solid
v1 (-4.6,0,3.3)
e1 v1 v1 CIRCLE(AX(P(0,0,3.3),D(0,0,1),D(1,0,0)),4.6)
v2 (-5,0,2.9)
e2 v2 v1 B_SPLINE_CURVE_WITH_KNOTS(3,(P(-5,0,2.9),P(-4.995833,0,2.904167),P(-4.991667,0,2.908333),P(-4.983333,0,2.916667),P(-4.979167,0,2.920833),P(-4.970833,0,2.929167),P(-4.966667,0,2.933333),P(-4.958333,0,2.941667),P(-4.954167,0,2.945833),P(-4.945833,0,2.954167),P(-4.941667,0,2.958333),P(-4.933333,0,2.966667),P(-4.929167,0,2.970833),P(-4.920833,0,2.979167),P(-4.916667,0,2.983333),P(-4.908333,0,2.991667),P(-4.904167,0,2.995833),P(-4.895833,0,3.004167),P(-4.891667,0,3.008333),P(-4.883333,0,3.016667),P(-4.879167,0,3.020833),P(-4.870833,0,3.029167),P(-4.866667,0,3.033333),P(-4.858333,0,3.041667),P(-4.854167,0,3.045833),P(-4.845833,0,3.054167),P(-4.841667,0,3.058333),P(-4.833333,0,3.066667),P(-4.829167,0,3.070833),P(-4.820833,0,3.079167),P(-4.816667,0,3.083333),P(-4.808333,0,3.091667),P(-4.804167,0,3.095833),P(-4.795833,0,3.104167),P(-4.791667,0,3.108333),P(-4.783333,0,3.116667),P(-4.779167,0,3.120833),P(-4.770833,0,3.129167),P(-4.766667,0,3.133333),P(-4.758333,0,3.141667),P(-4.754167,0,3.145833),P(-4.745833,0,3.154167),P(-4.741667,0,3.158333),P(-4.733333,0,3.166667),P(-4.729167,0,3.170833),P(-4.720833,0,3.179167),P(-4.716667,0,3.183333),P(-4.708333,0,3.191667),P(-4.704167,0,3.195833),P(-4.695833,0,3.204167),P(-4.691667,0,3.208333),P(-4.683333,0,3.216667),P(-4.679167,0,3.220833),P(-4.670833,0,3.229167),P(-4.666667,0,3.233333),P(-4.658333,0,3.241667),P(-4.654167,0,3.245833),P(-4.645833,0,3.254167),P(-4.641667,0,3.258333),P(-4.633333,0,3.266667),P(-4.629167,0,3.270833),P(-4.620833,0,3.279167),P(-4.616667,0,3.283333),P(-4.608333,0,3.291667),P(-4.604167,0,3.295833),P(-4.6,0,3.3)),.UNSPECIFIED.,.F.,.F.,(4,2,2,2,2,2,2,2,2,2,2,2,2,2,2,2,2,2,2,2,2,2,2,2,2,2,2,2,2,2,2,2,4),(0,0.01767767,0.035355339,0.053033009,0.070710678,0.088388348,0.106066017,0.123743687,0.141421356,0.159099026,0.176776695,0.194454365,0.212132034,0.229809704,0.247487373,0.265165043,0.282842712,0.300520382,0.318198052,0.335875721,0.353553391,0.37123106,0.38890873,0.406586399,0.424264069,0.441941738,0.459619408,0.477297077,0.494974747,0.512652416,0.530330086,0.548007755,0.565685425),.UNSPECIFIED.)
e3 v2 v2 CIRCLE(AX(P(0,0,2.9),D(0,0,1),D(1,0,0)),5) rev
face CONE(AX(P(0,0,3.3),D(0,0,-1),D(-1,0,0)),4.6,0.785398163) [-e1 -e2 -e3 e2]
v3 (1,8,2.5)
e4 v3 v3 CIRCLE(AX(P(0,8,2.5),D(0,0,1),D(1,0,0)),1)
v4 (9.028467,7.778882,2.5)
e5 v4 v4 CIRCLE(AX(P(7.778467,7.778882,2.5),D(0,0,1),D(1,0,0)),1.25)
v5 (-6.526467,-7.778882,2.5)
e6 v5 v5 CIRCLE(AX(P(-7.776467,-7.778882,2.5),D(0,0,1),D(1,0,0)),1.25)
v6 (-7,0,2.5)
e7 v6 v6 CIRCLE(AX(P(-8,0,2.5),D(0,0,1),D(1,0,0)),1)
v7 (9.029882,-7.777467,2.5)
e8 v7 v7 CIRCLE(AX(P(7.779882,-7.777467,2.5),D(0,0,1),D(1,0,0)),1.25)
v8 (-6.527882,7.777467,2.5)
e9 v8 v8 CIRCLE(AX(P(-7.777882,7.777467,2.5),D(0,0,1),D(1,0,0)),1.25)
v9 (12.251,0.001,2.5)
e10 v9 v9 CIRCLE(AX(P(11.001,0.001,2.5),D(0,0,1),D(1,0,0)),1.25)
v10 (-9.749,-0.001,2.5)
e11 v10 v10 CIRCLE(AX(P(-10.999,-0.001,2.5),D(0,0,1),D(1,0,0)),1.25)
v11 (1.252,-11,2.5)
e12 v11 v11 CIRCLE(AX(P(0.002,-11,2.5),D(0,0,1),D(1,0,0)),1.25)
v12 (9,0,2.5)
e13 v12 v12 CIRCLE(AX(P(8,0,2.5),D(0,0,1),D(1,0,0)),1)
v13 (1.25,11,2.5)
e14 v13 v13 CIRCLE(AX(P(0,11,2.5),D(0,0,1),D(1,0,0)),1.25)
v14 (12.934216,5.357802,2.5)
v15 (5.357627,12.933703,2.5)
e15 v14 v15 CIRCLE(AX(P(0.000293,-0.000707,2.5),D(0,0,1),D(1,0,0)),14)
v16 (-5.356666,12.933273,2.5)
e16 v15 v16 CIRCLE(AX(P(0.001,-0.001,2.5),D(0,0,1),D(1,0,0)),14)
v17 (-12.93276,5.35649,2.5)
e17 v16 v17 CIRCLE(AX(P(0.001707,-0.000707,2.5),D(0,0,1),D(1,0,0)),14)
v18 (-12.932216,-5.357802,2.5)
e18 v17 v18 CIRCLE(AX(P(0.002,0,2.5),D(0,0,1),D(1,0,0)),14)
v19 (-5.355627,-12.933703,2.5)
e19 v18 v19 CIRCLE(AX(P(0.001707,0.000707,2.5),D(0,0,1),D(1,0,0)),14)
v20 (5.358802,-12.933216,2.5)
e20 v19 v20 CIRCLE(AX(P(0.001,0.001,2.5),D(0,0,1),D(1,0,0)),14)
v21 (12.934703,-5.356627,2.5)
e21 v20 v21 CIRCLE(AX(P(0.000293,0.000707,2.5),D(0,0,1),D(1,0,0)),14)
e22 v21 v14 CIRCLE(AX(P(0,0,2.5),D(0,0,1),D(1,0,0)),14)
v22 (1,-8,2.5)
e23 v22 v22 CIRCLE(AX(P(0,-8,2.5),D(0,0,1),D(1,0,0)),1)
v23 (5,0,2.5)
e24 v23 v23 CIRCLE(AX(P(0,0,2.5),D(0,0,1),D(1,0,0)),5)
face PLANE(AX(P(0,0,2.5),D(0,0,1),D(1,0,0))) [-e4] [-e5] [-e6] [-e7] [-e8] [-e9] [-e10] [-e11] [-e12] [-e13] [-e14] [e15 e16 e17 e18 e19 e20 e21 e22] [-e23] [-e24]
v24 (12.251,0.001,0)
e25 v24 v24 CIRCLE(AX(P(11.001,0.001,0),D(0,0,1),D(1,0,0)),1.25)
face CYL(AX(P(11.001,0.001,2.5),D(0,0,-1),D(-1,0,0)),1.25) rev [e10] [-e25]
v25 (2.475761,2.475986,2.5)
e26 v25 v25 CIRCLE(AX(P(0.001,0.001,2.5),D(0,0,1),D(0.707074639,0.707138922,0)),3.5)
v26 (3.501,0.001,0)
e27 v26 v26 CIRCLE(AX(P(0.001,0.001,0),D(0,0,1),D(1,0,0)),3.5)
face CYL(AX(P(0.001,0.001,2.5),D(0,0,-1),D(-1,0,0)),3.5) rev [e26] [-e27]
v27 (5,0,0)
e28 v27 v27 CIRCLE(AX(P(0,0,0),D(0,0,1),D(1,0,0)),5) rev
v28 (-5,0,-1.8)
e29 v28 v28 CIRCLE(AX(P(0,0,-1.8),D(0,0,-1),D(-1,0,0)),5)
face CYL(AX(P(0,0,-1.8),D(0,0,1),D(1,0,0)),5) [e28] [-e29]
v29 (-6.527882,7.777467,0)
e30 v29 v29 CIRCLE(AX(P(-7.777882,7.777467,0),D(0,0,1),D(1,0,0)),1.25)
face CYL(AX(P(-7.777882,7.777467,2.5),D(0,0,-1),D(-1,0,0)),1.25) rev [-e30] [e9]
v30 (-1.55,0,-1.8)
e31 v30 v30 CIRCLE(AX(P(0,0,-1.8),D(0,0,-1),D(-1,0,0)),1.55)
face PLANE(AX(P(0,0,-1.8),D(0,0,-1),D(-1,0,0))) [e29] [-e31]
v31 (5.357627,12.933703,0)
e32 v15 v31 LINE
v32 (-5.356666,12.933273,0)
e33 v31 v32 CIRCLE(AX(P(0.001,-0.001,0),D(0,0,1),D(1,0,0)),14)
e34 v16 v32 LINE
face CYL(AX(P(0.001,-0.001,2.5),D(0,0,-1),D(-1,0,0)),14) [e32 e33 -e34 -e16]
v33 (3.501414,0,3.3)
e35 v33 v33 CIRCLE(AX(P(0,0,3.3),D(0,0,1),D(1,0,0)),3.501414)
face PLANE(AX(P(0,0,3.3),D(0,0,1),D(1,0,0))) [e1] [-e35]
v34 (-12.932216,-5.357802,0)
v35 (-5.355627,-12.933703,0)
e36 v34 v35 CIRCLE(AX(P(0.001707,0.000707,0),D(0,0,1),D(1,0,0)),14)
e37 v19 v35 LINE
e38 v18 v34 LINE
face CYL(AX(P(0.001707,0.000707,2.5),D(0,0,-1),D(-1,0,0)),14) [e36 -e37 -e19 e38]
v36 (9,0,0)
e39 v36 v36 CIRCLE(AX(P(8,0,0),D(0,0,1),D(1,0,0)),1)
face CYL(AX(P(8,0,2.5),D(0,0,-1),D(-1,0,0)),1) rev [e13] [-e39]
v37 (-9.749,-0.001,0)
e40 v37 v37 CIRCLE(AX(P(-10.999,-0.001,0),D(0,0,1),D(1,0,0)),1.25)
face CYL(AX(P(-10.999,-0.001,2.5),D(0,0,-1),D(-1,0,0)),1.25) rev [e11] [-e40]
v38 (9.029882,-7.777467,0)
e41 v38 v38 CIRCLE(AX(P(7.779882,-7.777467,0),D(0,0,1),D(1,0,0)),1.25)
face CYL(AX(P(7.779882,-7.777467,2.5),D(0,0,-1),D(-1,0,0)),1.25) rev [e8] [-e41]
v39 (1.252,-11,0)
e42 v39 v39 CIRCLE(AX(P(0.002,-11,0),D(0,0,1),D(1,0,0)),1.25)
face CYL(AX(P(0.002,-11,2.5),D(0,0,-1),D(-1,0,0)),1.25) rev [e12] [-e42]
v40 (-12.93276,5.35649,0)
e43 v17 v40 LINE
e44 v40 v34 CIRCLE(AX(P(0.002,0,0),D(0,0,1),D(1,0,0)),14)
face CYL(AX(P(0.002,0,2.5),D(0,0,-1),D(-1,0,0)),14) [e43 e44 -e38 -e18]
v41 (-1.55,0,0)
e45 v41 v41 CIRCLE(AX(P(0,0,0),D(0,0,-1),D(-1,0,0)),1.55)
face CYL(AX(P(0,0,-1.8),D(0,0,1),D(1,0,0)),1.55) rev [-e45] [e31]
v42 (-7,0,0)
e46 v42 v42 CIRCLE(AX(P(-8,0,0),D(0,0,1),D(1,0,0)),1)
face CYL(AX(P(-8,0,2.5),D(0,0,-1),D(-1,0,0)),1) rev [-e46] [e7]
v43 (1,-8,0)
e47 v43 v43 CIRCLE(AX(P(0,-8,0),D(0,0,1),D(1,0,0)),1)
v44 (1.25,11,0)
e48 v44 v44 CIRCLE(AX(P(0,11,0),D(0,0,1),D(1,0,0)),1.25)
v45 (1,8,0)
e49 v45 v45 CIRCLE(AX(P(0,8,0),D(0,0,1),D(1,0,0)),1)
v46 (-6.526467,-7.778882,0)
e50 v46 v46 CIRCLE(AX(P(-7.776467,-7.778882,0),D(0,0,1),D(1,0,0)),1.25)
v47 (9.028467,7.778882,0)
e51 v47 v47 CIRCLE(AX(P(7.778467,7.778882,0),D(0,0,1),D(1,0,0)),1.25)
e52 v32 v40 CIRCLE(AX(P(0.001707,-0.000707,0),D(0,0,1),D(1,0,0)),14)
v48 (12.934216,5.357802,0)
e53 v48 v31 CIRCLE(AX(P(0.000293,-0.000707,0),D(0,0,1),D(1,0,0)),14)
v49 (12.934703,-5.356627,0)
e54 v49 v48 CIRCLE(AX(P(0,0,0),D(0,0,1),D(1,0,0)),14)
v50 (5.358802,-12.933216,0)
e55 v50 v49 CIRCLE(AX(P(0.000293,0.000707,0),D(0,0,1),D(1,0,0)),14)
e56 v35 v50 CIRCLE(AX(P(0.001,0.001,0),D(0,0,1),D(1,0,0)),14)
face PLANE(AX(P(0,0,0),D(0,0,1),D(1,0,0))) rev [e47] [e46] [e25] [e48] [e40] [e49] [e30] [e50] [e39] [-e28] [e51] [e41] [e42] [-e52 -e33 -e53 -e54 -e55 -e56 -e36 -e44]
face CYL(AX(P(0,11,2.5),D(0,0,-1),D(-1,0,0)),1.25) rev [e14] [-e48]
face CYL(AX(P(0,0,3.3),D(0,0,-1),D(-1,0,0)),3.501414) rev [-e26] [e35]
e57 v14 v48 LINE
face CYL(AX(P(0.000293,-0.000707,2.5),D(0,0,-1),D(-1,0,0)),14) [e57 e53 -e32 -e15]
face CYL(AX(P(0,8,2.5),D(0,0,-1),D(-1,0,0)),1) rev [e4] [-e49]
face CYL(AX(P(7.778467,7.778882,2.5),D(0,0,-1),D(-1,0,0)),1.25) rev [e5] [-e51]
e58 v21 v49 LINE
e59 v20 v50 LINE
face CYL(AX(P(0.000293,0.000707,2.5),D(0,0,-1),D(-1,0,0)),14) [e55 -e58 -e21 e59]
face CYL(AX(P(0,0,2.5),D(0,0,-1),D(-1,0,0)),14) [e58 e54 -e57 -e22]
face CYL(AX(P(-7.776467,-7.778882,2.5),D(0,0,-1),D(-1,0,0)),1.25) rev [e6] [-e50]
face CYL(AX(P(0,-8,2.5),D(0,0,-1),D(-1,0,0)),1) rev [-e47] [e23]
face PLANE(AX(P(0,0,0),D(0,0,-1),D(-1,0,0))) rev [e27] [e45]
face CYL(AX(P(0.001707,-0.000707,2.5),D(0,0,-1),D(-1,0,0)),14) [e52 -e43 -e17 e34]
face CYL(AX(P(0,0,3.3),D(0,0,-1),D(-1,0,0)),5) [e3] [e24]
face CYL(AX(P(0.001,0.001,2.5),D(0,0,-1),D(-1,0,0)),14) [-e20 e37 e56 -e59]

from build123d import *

# Parameters (mm, degrees)
BOSS_EXTRUDE1_OUTLINE_R   = 1.25
BOSS_EXTRUDE1_OUTLINE_R_2 = 1
BOSS_EXTRUDE1_OUTLINE_R_3 = 1.250000008
BOSS_EXTRUDE1_OUTLINE_R_4 = 3.5
BOSS_EXTRUDE1_DEPTH       = 2.5
SKETCH3_R                 = 5
SKETCH3_R_2               = 1.55
BOSS_EXTRUDE2_DEPTH       = 1.8
BOSS_EXTRUDE3_START       = 0.8
SKETCH4_R                 = 5
SKETCH4_R_2               = 3.501414214
BOSS_EXTRUDE3_DEPTH       = 0.8
CHAMFER1_SIZE             = 0.4


# Read off the part's stored shape, not the designer's step: Boss-Extrude1
with BuildPart() as part:
    # Boss-Extrude1 outline → Boss-Extrude1 (new body)
    with BuildSketch(Plane.XY):
        with BuildLine():
            ThreePointArc((5.357626608, 12.933703439), (0.000437376, 13.999000034), (-5.356666208, 12.933272824))
            ThreePointArc((-5.356666208, 12.933272824), (-9.898237759, 9.898337914), (-12.932759786, 5.356490479))
            ThreePointArc((-12.932759786, 5.356490479), (-13.997999982, -0.000709967), (-12.932216374, -5.357802331))
            ThreePointArc((-12.932216374, -5.357802331), (-9.897337875, -9.899237719), (-5.355626608, -12.933703348))
            ThreePointArc((-5.355626608, -12.933703348), (0.001636318, -13.99899994), (5.358802377, -12.933216328))
            ThreePointArc((5.358802377, -12.933216328), (9.900237764, -9.898337829), (12.934703393, -5.356626562))
            ThreePointArc((12.934703393, -5.356626562), (13.999999986, 0.000636364), (12.934216374, 5.357802422))
            ThreePointArc((12.934216374, 5.357802422), (9.899337875, 9.89923781), (5.357626608, 12.933703439))
        make_face()
        with Locations((-7.776467454, -7.778881622)):
            Circle(BOSS_EXTRUDE1_OUTLINE_R, mode=Mode.SUBTRACT)
        with Locations((0, -8)):
            Circle(BOSS_EXTRUDE1_OUTLINE_R_2, mode=Mode.SUBTRACT)
        with Locations((-10.998999955, -0.000999955)):
            Circle(BOSS_EXTRUDE1_OUTLINE_R, mode=Mode.SUBTRACT)
        with Locations((-8, 0)):
            Circle(BOSS_EXTRUDE1_OUTLINE_R_2, mode=Mode.SUBTRACT)
        with Locations((0.002, -10.999999909)):
            Circle(BOSS_EXTRUDE1_OUTLINE_R, mode=Mode.SUBTRACT)
        with Locations((7.779881668, -7.777467409)):
            Circle(BOSS_EXTRUDE1_OUTLINE_R_3, mode=Mode.SUBTRACT)
        with Locations((8, 0)):
            Circle(BOSS_EXTRUDE1_OUTLINE_R_2, mode=Mode.SUBTRACT)
        with Locations((0.000999955, 0.001000045)):
            Circle(BOSS_EXTRUDE1_OUTLINE_R_4, mode=Mode.SUBTRACT)
        with Locations((-7.777881668, 7.7774675)):
            Circle(BOSS_EXTRUDE1_OUTLINE_R, mode=Mode.SUBTRACT)
        with Locations((0, 8)):
            Circle(BOSS_EXTRUDE1_OUTLINE_R_2, mode=Mode.SUBTRACT)
        with Locations((0, 11)):
            Circle(BOSS_EXTRUDE1_OUTLINE_R, mode=Mode.SUBTRACT)
        with Locations((11.000999955, 0.001000045)):
            Circle(BOSS_EXTRUDE1_OUTLINE_R, mode=Mode.SUBTRACT)
        with Locations((7.778467454, 7.778881713)):
            Circle(BOSS_EXTRUDE1_OUTLINE_R, mode=Mode.SUBTRACT)
    extrude(amount=BOSS_EXTRUDE1_DEPTH)

    # Sketch3 → Boss-Extrude2 (add)
    with BuildSketch(Plane(origin=(0, 0, 0), x_dir=(-1, 0, 0), z_dir=(0, 0, -1))):
        with Locations(Location((0, 0, 0), (0, 0, 180))):
            Circle(SKETCH3_R)
        Circle(SKETCH3_R_2, mode=Mode.SUBTRACT)
    extrude(amount=BOSS_EXTRUDE2_DEPTH)

    # Sketch4 → Boss-Extrude3 (add)
    with BuildSketch(Plane.XY.offset(2.5).offset(BOSS_EXTRUDE3_START)):
        Circle(SKETCH4_R)
        with Locations(Location((0, 0, 0), (0, 0, 45.002604354))):
            Circle(SKETCH4_R_2, mode=Mode.SUBTRACT)
    extrude(amount=-BOSS_EXTRUDE3_DEPTH)

    # Chamfer1
    chamfer1_edges = [part.edges().sort_by_distance(p)[0] for p in [
        (-5, 0, 3.3),
    ]]
    chamfer(chamfer1_edges, length=CHAMFER1_SIZE)


solid = part.part
